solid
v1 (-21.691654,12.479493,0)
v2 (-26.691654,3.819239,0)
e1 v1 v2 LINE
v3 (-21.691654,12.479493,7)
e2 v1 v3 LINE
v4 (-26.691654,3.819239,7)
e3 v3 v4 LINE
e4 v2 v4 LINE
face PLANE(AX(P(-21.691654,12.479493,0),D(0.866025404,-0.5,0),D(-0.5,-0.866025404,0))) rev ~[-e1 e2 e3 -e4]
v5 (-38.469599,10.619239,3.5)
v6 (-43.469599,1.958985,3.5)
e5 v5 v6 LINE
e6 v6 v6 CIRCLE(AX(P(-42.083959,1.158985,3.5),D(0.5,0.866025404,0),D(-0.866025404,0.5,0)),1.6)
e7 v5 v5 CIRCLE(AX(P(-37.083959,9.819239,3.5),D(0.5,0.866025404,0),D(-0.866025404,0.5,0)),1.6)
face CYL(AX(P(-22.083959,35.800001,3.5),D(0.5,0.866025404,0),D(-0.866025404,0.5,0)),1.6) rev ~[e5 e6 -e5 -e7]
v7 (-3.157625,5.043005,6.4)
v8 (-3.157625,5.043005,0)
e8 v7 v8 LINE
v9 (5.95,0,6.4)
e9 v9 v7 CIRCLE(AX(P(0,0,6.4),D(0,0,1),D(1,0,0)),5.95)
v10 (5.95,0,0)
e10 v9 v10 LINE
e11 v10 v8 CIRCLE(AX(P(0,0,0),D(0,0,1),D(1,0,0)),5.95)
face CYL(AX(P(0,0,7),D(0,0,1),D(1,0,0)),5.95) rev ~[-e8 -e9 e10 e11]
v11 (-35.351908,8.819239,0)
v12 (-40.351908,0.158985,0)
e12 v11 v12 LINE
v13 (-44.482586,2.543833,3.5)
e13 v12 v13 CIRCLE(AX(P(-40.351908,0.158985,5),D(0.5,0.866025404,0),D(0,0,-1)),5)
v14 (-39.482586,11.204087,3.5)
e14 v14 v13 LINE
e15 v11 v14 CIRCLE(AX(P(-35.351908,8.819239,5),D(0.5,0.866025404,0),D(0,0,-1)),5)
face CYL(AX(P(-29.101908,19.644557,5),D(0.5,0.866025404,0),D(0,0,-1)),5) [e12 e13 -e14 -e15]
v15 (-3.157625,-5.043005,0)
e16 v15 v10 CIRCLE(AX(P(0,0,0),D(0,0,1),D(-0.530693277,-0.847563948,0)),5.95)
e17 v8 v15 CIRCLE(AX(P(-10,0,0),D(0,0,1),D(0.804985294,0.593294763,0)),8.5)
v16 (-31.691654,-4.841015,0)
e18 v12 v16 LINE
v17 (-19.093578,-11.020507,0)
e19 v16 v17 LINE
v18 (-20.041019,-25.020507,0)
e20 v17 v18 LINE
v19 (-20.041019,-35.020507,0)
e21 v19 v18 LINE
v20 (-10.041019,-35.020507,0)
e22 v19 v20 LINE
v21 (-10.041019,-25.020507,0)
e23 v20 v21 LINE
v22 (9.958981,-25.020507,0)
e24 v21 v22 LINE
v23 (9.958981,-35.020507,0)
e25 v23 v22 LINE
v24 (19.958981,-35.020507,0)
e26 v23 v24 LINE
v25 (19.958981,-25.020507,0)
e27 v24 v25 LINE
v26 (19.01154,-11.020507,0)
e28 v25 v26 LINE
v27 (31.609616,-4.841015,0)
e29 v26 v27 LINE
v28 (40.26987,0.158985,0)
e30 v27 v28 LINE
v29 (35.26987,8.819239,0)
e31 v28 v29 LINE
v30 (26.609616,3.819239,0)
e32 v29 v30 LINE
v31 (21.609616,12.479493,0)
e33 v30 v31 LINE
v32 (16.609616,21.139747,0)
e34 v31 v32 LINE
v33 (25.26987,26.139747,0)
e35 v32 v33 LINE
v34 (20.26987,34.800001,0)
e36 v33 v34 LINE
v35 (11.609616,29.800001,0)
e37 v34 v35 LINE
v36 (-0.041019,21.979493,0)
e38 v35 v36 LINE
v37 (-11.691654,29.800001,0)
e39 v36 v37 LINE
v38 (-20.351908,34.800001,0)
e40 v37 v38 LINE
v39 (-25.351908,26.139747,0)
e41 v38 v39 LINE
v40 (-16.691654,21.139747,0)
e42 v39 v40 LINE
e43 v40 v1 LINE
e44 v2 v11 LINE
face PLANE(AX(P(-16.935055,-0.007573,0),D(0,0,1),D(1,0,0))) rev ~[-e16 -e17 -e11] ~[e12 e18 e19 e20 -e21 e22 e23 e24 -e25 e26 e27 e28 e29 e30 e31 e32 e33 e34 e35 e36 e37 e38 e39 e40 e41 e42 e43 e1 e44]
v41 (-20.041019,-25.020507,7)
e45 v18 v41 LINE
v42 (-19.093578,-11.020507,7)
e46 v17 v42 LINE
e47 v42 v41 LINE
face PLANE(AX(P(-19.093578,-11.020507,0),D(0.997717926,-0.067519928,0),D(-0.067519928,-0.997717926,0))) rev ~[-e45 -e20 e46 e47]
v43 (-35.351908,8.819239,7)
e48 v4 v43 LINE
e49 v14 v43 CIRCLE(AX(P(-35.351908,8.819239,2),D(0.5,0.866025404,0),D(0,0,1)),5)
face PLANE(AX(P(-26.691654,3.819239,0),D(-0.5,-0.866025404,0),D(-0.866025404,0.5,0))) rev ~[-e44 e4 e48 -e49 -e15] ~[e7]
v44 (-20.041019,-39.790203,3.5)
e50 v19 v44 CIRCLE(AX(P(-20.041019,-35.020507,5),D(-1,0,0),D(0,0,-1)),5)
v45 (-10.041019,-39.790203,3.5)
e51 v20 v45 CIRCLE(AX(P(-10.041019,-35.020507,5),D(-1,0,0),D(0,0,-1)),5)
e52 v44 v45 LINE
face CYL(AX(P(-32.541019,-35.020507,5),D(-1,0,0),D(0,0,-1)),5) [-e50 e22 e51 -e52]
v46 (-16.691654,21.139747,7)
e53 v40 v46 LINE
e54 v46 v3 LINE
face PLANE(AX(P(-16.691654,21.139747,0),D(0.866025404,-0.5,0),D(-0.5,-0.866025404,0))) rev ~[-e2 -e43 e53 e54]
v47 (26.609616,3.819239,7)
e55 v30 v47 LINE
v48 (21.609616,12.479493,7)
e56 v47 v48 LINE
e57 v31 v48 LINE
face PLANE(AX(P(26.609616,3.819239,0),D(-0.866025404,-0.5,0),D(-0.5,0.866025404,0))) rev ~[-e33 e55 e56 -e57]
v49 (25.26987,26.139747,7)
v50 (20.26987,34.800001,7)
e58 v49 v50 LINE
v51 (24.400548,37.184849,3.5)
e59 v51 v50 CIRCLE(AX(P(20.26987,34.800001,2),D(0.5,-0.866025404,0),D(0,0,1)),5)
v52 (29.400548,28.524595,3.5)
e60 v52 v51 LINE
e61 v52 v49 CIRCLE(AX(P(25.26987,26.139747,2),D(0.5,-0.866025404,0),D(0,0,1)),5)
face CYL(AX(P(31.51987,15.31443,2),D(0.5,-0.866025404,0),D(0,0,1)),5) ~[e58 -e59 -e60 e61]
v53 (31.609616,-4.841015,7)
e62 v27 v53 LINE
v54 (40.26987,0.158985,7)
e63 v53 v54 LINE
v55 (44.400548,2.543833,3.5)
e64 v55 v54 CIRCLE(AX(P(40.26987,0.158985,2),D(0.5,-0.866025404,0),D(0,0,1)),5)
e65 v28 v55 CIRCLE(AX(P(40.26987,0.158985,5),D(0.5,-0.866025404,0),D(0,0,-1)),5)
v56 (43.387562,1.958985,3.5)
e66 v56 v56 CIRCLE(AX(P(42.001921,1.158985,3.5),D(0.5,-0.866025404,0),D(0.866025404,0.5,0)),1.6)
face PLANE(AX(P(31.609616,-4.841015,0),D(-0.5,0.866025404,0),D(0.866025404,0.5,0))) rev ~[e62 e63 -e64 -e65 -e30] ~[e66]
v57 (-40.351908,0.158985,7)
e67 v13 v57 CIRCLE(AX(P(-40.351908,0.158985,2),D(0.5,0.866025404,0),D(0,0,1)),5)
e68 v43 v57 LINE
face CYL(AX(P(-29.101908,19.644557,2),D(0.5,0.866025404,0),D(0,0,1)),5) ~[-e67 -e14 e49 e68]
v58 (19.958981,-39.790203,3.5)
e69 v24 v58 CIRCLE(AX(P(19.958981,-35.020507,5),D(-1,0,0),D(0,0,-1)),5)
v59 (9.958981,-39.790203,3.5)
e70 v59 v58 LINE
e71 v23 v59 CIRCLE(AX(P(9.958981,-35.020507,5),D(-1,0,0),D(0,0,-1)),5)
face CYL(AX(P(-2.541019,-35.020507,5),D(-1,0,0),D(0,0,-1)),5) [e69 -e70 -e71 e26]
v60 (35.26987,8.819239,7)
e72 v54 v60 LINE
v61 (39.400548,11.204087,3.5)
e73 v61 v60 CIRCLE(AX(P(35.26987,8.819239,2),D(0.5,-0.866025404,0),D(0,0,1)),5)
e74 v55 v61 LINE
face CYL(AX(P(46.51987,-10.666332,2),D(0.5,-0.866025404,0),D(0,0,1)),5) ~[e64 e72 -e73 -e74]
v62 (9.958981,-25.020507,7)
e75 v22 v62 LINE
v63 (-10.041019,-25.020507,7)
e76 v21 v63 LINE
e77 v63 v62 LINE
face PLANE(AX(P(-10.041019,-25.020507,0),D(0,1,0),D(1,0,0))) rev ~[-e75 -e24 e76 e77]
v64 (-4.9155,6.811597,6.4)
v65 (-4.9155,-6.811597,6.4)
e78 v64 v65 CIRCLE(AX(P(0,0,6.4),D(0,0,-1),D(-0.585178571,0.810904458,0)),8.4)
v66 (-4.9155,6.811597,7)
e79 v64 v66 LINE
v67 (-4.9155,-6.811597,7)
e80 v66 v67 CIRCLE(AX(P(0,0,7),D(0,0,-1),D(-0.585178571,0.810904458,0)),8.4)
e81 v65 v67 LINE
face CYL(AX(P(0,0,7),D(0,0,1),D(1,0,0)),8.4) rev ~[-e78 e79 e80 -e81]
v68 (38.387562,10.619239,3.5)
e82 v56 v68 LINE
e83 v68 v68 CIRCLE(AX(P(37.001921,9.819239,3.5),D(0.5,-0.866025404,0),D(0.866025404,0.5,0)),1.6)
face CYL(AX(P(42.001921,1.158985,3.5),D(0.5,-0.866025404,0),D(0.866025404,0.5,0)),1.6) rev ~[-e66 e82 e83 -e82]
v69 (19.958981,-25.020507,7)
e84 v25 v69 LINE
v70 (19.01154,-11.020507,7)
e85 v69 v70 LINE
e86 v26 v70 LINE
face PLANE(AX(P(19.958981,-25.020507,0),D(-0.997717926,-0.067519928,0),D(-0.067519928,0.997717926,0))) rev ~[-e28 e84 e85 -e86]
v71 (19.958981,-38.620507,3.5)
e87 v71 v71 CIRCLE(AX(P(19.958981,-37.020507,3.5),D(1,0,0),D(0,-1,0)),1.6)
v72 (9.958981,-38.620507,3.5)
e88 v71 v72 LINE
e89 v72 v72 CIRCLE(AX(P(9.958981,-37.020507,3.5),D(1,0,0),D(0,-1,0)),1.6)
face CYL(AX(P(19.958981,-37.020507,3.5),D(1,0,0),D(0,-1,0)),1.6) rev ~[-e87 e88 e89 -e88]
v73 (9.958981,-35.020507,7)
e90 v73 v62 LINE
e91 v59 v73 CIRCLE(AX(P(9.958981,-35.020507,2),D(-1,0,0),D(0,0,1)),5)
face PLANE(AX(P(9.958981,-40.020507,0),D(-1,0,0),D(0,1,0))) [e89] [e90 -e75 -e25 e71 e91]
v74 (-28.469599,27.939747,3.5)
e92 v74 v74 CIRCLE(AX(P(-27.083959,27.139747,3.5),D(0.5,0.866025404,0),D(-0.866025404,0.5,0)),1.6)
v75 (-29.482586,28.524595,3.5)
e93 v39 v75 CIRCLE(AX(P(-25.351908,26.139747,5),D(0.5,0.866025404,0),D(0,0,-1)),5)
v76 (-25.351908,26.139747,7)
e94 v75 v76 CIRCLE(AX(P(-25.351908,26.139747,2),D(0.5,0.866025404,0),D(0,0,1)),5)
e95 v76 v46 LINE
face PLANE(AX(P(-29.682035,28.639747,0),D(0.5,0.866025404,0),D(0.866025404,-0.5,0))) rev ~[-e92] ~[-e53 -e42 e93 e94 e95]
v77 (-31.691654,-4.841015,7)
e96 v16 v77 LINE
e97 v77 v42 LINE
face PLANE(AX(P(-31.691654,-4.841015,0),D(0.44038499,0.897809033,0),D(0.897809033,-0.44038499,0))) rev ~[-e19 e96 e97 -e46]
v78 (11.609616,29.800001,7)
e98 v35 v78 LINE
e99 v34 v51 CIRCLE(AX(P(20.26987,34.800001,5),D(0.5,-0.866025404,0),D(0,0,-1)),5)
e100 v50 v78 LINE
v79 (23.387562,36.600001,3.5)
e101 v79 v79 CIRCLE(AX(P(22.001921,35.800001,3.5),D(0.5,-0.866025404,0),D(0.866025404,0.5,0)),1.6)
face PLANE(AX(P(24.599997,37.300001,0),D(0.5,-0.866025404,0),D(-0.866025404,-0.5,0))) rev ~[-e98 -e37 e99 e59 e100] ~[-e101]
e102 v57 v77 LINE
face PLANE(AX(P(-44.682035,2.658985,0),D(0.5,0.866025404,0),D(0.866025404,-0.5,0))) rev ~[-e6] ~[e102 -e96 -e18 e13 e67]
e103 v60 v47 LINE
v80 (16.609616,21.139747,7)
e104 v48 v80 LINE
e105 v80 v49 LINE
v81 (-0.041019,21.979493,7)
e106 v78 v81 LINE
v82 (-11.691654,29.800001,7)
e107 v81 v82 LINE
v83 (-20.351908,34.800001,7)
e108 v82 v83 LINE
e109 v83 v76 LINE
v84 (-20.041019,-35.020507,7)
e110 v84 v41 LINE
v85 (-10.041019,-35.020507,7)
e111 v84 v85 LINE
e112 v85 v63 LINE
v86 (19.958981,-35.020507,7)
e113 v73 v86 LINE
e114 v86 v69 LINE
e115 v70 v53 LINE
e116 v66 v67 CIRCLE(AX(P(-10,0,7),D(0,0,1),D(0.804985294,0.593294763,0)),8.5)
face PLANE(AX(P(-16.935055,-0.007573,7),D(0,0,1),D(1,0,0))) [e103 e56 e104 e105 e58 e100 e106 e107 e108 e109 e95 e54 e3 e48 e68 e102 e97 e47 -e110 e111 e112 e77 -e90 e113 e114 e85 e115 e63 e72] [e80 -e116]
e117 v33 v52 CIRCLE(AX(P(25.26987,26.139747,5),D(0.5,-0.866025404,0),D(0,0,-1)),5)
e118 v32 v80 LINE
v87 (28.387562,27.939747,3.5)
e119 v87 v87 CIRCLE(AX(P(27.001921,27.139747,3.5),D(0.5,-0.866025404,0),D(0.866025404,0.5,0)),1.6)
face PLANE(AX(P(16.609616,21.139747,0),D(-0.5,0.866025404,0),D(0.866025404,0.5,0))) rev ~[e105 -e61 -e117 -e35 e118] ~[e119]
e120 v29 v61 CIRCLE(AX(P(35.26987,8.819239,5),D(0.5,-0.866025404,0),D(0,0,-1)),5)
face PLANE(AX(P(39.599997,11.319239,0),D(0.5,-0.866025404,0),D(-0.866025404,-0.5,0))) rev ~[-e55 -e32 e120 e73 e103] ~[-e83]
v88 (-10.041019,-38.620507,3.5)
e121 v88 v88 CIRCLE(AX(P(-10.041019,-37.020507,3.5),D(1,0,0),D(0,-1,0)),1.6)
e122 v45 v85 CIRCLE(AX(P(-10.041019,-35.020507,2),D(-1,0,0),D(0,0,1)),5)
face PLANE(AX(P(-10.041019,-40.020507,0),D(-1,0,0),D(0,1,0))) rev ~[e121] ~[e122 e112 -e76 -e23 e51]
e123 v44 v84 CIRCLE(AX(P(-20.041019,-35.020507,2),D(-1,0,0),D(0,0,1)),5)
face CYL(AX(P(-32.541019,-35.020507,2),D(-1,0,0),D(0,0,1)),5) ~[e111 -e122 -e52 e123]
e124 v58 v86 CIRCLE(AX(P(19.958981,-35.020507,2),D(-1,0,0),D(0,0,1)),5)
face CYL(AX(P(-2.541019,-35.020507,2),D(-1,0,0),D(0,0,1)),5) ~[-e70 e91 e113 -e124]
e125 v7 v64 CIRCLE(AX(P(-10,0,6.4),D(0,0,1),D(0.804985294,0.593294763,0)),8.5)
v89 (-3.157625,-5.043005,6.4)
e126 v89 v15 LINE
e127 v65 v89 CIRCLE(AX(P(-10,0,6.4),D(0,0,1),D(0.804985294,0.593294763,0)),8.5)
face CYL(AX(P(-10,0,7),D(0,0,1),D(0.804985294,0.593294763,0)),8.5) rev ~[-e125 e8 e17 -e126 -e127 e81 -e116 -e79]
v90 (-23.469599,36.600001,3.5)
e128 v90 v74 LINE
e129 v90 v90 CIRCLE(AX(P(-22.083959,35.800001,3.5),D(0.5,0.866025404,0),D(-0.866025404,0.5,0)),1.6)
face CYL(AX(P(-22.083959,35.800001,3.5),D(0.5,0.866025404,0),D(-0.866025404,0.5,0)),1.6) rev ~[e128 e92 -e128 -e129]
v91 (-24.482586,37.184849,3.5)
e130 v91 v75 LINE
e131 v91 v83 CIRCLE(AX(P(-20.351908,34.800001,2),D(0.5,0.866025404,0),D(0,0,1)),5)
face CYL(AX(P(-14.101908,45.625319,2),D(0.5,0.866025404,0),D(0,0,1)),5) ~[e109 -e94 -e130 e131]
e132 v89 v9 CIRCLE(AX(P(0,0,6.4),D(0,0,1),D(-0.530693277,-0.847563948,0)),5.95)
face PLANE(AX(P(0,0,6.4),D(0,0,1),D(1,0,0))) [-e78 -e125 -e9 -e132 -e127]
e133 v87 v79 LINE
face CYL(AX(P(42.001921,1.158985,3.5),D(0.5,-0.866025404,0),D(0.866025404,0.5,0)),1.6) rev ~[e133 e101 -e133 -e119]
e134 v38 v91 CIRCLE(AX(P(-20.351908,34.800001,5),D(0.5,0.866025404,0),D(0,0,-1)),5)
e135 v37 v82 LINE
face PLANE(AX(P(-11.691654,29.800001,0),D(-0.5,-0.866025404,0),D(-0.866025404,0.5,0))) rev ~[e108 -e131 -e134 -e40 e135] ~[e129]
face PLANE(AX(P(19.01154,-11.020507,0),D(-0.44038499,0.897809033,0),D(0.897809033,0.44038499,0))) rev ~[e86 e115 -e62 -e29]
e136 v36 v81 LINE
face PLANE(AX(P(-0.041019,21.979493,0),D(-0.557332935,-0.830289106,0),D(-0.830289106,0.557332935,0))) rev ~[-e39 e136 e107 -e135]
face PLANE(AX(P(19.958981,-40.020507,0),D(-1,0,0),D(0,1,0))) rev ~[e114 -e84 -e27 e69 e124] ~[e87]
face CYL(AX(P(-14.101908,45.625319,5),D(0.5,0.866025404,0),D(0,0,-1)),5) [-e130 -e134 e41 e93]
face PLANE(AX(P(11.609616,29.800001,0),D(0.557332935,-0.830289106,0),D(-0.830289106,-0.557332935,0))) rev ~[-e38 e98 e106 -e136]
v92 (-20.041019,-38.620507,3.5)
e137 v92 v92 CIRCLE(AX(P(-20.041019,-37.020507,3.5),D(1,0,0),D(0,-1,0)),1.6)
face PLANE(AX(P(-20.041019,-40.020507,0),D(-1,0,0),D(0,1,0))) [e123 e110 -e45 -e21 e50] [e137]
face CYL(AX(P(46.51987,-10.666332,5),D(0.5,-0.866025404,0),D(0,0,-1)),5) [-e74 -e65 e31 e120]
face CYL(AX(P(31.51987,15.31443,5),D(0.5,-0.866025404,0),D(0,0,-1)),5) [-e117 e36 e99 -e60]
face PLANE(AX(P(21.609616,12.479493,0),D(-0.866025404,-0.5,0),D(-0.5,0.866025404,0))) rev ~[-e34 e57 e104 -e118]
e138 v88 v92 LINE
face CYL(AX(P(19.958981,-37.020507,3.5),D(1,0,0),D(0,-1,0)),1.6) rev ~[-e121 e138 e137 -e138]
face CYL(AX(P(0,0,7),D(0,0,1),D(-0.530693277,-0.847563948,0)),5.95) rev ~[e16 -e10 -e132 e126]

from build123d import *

# Parameters (mm, degrees)
F0_W         = 10
F0_H         = 15
F1_DEPTH     = 7
F3_DEPTH     = 60
F4_R         = 1.6
F5_DEPTH     = 60
F6_R         = 1.6
F7_DEPTH     = 60
F8_T1_DEPTH  = 35
F8_T3_DEPTH  = 35
F8_T5_DEPTH  = 35
F8_T7_DEPTH  = 35
F8_T9_DEPTH  = 35
F8_T11_DEPTH = 35
F11_DEPTH    = 25
F12_R        = 8.4
F13_DEPTH    = 0.6


# Not quite as in the source:
# - a fillet or chamfer that OpenCascade refuses, or shapes differently, is made with other operations: its cross-section is extruded or revolved along the edge and cut away or added
# - a feature names something its author has since deleted; it is built from what else it names


with BuildPart() as f1:
    # F0 (on Top) → F1 (new body)
    with BuildSketch(Plane.XY):
        Polygon((-19.0935776077, -11.020506829), (-0.0410187244, -0.020506829), (-21.6916538191, 12.479493171), (-26.6916538191, 3.8192391331), (-31.6916538191, -4.8410149047), align=None)
        Polygon((-0.0410187244, 21.979493171), (-0.0410187244, -0.020506829), (21.6096163702, 12.479493171), (16.6096163702, 21.1397472088), (11.6096163702, 29.8000012467), align=None)
        Polygon((19.0115401588, -11.020506829), (-0.0410187244, -0.020506829), (-0.0410187244, -25.020506829), (9.9589812756, -25.020506829), (19.9589812756, -25.020506829), align=None)
        Polygon((-0.0410187244, -25.020506829), (-0.0410187244, -0.020506829), (-19.0935776077, -11.020506829), (-20.0410187244, -25.020506829), (-10.0410187244, -25.020506829), align=None)
        Polygon((-21.6916538191, 12.479493171), (-0.0410187244, -0.020506829), (-0.0410187244, 21.979493171), (-11.6916538191, 29.8000012467), (-16.6916538191, 21.1397472088), align=None)
        Polygon((21.6096163702, 12.479493171), (-0.0410187244, -0.020506829), (19.0115401588, -11.020506829), (31.6096163702, -4.8410149047), (26.6096163702, 3.8192391331), align=None)
        Polygon((-29.6820348758, 28.6397472088), (-16.6916538191, 21.1397472088), (-11.6916538191, 29.8000012467), (-24.6820348758, 37.3000012467), align=None)
        Polygon((-31.6916538191, -4.8410149047), (-26.6916538191, 3.8192391331), (-39.6820348758, 11.3192391331), (-44.6820348758, 2.6589850953), align=None)
        Polygon((39.5999974269, 11.3192391331), (26.6096163702, 3.8192391331), (31.6096163702, -4.8410149047), (44.5999974269, 2.6589850953), align=None)
        Polygon((11.6096163702, 29.8000012467), (16.6096163702, 21.1397472088), (29.5999974269, 28.6397472088), (24.5999974269, 37.3000012467), align=None)
        with Locations((-15.0410187244, -32.520506829)):
            Rectangle(F0_W, F0_H)
        with Locations((14.9589812756, -32.520506829)):
            Rectangle(F0_W, F0_H)
    extrude(amount=F1_DEPTH)

    # F2 (on face) → F3 (cut)
    with BuildSketch(Plane.YZ.offset(19.9589812756)):
        with BuildLine():
            ThreePointArc((-35.420506829, 3.5), (-37.020506829, 5.1), (-38.620506829, 3.5))
            ThreePointArc((-38.620506829, 3.5), (-37.020506829, 1.9), (-35.420506829, 3.5))
        make_face()
    extrude(amount=-F3_DEPTH, mode=Mode.SUBTRACT)

    # F4 (on face) → F5 (cut)
    with BuildSketch(Plane(origin=(9.9986250363, -17.3181265688, 0), x_dir=(0.8660254038, 0.5, 0), z_dir=(0.5, -0.8660254038, 0))):
        with Locations((36.9542233281, 3.5)):
            Circle(F4_R)
    extrude(amount=-F5_DEPTH, mode=Mode.SUBTRACT)

    # F6 (on face) → F7 (cut)
    with BuildSketch(Plane(origin=(9.9808656014, 17.2873663252, 0), x_dir=(-0.8660254038, 0.5, 0), z_dir=(0.5, 0.8660254038, 0))):
        with Locations((37.0252698429, 3.5)):
            Circle(F6_R)
    extrude(amount=-F7_DEPTH, mode=Mode.SUBTRACT)

    # F8: fillet of radius 5 on 12 edges, made by hand

    # F8_s2 → F8_t1 (cut)
    with BuildSketch(Plane.YZ.offset(-32.5410187244)):
        with BuildLine():
            ThreePointArc((-35.020506829, 7), (-38.556040735, 5.5355339059), (-40.020506829, 2))
            Line((-40.020506829, 2), (-40.020506829, 7))
            Line((-40.020506829, 7), (-35.020506829, 7))
        make_face()
        with BuildLine():
            ThreePointArc((-35.020506829, 0), (-38.556040735, 1.4644660941), (-40.020506829, 5))
            Line((-40.020506829, 5), (-40.020506829, 0))
            Line((-40.020506829, 0), (-35.020506829, 0))
        make_face()
    extrude(amount=F8_T1_DEPTH, mode=Mode.SUBTRACT)

    # F8_s4 → F8_t3 (cut)
    with BuildSketch(Plane.YZ.offset(-2.5410187244)):
        with BuildLine():
            ThreePointArc((-35.020506829, 0), (-38.556040735, 1.4644660941), (-40.020506829, 5))
            Line((-40.020506829, 5), (-40.020506829, 0))
            Line((-40.020506829, 0), (-35.020506829, 0))
        make_face()
        with BuildLine():
            ThreePointArc((-35.020506829, 7), (-38.556040735, 5.5355339059), (-40.020506829, 2))
            Line((-40.020506829, 2), (-40.020506829, 7))
            Line((-40.020506829, 7), (-35.020506829, 7))
        make_face()
    extrude(amount=F8_T3_DEPTH, mode=Mode.SUBTRACT)

    # F8_s6 → F8_t5 (cut)
    with BuildSketch(Plane(origin=(16.2486250363, -28.1434441161, 0), x_dir=(0, 0, 1), z_dir=(-0.5, 0.8660254038, 0))):
        with BuildLine():
            ThreePointArc((7, 34.9542233281), (5.5355339059, 38.489757234), (2, 39.9542233281))
            Line((2, 39.9542233281), (7, 39.9542233281))
            Line((7, 39.9542233281), (7, 34.9542233281))
        make_face()
        with BuildLine():
            ThreePointArc((0, 34.9542233281), (1.4644660941, 38.489757234), (5, 39.9542233281))
            Line((5, 39.9542233281), (0, 39.9542233281))
            Line((0, 39.9542233281), (0, 34.9542233281))
        make_face()
    extrude(amount=F8_T5_DEPTH, mode=Mode.SUBTRACT)

    # F8_s8 → F8_t7 (cut)
    with BuildSketch(Plane(origin=(1.2486250363, -2.1626820025, 0), x_dir=(0, 0, 1), z_dir=(-0.5, 0.8660254038, 0))):
        with BuildLine():
            ThreePointArc((7, 34.9542233281), (5.5355339059, 38.489757234), (2, 39.9542233281))
            Line((2, 39.9542233281), (7, 39.9542233281))
            Line((7, 39.9542233281), (7, 34.9542233281))
        make_face()
        with BuildLine():
            ThreePointArc((0, 34.9542233281), (1.4644660941, 38.489757234), (5, 39.9542233281))
            Line((5, 39.9542233281), (0, 39.9542233281))
            Line((0, 39.9542233281), (0, 34.9542233281))
        make_face()
    extrude(amount=F8_T7_DEPTH, mode=Mode.SUBTRACT)

    # F8_s10 → F8_t9 (cut)
    with BuildSketch(Plane(origin=(16.2308656014, 28.1126838725, 0), x_dir=(0, 0, 1), z_dir=(-0.5, -0.8660254038, 0))):
        with BuildLine():
            ThreePointArc((7, 35.0252698429), (5.5355339059, 38.5608037488), (2, 40.0252698429))
            Line((2, 40.0252698429), (7, 40.0252698429))
            Line((7, 40.0252698429), (7, 35.0252698429))
        make_face()
        with BuildLine():
            ThreePointArc((0, 35.0252698429), (1.4644660941, 38.5608037488), (5, 40.0252698429))
            Line((5, 40.0252698429), (0, 40.0252698429))
            Line((0, 40.0252698429), (0, 35.0252698429))
        make_face()
    extrude(amount=F8_T9_DEPTH, mode=Mode.SUBTRACT)

    # F8_s12 → F8_t11 (cut)
    with BuildSketch(Plane(origin=(1.2308656014, 2.131921759, 0), x_dir=(0, 0, 1), z_dir=(-0.5, -0.8660254038, 0))):
        with BuildLine():
            ThreePointArc((7, 35.0252698429), (5.5355339059, 38.5608037488), (2, 40.0252698429))
            Line((2, 40.0252698429), (7, 40.0252698429))
            Line((7, 40.0252698429), (7, 35.0252698429))
        make_face()
        with BuildLine():
            ThreePointArc((0, 35.0252698429), (1.4644660941, 38.5608037488), (5, 40.0252698429))
            Line((5, 40.0252698429), (0, 40.0252698429))
            Line((0, 40.0252698429), (0, 35.0252698429))
        make_face()
    extrude(amount=F8_T11_DEPTH, mode=Mode.SUBTRACT)

    # F10 (on face) → F11 (cut)
    with BuildSketch(Plane.XY.offset(7)):
        with BuildLine():
            ThreePointArc((-3.157625, -5.0430054887), (-1.9250328948, -2.6542242275), (-1.5, 0))
            Line((-1.5, 0), (-5.95, 0))
            ThreePointArc((-5.95, 0), (-5.2053034854, -2.8822414238), (-3.157625, -5.0430054887))
        make_face()
        with BuildLine():
            Line((-5.95, 0), (-1.5, 0))
            ThreePointArc((-1.5, 0), (-1.9250328948, 2.6542242275), (-3.157625, 5.0430054887))
            ThreePointArc((-3.157625, 5.0430054887), (-5.2053034854, 2.8822414238), (-5.95, 0))
        make_face()
        with BuildLine():
            ThreePointArc((-3.157625, 5.0430054887), (-1.9250328948, 2.6542242275), (-1.5, 0))
            ThreePointArc((-1.5, 0), (-1.9250328948, -2.6542242275), (-3.157625, -5.0430054887))
            ThreePointArc((-3.157625, -5.0430054887), (2.8822414238, -5.2053034854), (5.95, 0))
            ThreePointArc((5.95, 0), (2.8822414238, 5.2053034854), (-3.157625, 5.0430054887))
        make_face()
        with BuildLine():
            ThreePointArc((-3.157625, -5.0430054887), (-5.2053034854, -2.8822414238), (-5.95, 0))
            ThreePointArc((-5.95, 0), (-5.2053034854, 2.8822414238), (-3.157625, 5.0430054887))
            ThreePointArc((-3.157625, 5.0430054887), (-18.5, 0), (-3.157625, -5.0430054887))
        make_face()
    extrude(amount=-F11_DEPTH, mode=Mode.SUBTRACT)

    # F12 (on face) → F13 (cut)
    with BuildSketch(Plane.XY.offset(7)):
        Circle(F12_R)
    extrude(amount=-F13_DEPTH, mode=Mode.SUBTRACT)


solid = f1.part
